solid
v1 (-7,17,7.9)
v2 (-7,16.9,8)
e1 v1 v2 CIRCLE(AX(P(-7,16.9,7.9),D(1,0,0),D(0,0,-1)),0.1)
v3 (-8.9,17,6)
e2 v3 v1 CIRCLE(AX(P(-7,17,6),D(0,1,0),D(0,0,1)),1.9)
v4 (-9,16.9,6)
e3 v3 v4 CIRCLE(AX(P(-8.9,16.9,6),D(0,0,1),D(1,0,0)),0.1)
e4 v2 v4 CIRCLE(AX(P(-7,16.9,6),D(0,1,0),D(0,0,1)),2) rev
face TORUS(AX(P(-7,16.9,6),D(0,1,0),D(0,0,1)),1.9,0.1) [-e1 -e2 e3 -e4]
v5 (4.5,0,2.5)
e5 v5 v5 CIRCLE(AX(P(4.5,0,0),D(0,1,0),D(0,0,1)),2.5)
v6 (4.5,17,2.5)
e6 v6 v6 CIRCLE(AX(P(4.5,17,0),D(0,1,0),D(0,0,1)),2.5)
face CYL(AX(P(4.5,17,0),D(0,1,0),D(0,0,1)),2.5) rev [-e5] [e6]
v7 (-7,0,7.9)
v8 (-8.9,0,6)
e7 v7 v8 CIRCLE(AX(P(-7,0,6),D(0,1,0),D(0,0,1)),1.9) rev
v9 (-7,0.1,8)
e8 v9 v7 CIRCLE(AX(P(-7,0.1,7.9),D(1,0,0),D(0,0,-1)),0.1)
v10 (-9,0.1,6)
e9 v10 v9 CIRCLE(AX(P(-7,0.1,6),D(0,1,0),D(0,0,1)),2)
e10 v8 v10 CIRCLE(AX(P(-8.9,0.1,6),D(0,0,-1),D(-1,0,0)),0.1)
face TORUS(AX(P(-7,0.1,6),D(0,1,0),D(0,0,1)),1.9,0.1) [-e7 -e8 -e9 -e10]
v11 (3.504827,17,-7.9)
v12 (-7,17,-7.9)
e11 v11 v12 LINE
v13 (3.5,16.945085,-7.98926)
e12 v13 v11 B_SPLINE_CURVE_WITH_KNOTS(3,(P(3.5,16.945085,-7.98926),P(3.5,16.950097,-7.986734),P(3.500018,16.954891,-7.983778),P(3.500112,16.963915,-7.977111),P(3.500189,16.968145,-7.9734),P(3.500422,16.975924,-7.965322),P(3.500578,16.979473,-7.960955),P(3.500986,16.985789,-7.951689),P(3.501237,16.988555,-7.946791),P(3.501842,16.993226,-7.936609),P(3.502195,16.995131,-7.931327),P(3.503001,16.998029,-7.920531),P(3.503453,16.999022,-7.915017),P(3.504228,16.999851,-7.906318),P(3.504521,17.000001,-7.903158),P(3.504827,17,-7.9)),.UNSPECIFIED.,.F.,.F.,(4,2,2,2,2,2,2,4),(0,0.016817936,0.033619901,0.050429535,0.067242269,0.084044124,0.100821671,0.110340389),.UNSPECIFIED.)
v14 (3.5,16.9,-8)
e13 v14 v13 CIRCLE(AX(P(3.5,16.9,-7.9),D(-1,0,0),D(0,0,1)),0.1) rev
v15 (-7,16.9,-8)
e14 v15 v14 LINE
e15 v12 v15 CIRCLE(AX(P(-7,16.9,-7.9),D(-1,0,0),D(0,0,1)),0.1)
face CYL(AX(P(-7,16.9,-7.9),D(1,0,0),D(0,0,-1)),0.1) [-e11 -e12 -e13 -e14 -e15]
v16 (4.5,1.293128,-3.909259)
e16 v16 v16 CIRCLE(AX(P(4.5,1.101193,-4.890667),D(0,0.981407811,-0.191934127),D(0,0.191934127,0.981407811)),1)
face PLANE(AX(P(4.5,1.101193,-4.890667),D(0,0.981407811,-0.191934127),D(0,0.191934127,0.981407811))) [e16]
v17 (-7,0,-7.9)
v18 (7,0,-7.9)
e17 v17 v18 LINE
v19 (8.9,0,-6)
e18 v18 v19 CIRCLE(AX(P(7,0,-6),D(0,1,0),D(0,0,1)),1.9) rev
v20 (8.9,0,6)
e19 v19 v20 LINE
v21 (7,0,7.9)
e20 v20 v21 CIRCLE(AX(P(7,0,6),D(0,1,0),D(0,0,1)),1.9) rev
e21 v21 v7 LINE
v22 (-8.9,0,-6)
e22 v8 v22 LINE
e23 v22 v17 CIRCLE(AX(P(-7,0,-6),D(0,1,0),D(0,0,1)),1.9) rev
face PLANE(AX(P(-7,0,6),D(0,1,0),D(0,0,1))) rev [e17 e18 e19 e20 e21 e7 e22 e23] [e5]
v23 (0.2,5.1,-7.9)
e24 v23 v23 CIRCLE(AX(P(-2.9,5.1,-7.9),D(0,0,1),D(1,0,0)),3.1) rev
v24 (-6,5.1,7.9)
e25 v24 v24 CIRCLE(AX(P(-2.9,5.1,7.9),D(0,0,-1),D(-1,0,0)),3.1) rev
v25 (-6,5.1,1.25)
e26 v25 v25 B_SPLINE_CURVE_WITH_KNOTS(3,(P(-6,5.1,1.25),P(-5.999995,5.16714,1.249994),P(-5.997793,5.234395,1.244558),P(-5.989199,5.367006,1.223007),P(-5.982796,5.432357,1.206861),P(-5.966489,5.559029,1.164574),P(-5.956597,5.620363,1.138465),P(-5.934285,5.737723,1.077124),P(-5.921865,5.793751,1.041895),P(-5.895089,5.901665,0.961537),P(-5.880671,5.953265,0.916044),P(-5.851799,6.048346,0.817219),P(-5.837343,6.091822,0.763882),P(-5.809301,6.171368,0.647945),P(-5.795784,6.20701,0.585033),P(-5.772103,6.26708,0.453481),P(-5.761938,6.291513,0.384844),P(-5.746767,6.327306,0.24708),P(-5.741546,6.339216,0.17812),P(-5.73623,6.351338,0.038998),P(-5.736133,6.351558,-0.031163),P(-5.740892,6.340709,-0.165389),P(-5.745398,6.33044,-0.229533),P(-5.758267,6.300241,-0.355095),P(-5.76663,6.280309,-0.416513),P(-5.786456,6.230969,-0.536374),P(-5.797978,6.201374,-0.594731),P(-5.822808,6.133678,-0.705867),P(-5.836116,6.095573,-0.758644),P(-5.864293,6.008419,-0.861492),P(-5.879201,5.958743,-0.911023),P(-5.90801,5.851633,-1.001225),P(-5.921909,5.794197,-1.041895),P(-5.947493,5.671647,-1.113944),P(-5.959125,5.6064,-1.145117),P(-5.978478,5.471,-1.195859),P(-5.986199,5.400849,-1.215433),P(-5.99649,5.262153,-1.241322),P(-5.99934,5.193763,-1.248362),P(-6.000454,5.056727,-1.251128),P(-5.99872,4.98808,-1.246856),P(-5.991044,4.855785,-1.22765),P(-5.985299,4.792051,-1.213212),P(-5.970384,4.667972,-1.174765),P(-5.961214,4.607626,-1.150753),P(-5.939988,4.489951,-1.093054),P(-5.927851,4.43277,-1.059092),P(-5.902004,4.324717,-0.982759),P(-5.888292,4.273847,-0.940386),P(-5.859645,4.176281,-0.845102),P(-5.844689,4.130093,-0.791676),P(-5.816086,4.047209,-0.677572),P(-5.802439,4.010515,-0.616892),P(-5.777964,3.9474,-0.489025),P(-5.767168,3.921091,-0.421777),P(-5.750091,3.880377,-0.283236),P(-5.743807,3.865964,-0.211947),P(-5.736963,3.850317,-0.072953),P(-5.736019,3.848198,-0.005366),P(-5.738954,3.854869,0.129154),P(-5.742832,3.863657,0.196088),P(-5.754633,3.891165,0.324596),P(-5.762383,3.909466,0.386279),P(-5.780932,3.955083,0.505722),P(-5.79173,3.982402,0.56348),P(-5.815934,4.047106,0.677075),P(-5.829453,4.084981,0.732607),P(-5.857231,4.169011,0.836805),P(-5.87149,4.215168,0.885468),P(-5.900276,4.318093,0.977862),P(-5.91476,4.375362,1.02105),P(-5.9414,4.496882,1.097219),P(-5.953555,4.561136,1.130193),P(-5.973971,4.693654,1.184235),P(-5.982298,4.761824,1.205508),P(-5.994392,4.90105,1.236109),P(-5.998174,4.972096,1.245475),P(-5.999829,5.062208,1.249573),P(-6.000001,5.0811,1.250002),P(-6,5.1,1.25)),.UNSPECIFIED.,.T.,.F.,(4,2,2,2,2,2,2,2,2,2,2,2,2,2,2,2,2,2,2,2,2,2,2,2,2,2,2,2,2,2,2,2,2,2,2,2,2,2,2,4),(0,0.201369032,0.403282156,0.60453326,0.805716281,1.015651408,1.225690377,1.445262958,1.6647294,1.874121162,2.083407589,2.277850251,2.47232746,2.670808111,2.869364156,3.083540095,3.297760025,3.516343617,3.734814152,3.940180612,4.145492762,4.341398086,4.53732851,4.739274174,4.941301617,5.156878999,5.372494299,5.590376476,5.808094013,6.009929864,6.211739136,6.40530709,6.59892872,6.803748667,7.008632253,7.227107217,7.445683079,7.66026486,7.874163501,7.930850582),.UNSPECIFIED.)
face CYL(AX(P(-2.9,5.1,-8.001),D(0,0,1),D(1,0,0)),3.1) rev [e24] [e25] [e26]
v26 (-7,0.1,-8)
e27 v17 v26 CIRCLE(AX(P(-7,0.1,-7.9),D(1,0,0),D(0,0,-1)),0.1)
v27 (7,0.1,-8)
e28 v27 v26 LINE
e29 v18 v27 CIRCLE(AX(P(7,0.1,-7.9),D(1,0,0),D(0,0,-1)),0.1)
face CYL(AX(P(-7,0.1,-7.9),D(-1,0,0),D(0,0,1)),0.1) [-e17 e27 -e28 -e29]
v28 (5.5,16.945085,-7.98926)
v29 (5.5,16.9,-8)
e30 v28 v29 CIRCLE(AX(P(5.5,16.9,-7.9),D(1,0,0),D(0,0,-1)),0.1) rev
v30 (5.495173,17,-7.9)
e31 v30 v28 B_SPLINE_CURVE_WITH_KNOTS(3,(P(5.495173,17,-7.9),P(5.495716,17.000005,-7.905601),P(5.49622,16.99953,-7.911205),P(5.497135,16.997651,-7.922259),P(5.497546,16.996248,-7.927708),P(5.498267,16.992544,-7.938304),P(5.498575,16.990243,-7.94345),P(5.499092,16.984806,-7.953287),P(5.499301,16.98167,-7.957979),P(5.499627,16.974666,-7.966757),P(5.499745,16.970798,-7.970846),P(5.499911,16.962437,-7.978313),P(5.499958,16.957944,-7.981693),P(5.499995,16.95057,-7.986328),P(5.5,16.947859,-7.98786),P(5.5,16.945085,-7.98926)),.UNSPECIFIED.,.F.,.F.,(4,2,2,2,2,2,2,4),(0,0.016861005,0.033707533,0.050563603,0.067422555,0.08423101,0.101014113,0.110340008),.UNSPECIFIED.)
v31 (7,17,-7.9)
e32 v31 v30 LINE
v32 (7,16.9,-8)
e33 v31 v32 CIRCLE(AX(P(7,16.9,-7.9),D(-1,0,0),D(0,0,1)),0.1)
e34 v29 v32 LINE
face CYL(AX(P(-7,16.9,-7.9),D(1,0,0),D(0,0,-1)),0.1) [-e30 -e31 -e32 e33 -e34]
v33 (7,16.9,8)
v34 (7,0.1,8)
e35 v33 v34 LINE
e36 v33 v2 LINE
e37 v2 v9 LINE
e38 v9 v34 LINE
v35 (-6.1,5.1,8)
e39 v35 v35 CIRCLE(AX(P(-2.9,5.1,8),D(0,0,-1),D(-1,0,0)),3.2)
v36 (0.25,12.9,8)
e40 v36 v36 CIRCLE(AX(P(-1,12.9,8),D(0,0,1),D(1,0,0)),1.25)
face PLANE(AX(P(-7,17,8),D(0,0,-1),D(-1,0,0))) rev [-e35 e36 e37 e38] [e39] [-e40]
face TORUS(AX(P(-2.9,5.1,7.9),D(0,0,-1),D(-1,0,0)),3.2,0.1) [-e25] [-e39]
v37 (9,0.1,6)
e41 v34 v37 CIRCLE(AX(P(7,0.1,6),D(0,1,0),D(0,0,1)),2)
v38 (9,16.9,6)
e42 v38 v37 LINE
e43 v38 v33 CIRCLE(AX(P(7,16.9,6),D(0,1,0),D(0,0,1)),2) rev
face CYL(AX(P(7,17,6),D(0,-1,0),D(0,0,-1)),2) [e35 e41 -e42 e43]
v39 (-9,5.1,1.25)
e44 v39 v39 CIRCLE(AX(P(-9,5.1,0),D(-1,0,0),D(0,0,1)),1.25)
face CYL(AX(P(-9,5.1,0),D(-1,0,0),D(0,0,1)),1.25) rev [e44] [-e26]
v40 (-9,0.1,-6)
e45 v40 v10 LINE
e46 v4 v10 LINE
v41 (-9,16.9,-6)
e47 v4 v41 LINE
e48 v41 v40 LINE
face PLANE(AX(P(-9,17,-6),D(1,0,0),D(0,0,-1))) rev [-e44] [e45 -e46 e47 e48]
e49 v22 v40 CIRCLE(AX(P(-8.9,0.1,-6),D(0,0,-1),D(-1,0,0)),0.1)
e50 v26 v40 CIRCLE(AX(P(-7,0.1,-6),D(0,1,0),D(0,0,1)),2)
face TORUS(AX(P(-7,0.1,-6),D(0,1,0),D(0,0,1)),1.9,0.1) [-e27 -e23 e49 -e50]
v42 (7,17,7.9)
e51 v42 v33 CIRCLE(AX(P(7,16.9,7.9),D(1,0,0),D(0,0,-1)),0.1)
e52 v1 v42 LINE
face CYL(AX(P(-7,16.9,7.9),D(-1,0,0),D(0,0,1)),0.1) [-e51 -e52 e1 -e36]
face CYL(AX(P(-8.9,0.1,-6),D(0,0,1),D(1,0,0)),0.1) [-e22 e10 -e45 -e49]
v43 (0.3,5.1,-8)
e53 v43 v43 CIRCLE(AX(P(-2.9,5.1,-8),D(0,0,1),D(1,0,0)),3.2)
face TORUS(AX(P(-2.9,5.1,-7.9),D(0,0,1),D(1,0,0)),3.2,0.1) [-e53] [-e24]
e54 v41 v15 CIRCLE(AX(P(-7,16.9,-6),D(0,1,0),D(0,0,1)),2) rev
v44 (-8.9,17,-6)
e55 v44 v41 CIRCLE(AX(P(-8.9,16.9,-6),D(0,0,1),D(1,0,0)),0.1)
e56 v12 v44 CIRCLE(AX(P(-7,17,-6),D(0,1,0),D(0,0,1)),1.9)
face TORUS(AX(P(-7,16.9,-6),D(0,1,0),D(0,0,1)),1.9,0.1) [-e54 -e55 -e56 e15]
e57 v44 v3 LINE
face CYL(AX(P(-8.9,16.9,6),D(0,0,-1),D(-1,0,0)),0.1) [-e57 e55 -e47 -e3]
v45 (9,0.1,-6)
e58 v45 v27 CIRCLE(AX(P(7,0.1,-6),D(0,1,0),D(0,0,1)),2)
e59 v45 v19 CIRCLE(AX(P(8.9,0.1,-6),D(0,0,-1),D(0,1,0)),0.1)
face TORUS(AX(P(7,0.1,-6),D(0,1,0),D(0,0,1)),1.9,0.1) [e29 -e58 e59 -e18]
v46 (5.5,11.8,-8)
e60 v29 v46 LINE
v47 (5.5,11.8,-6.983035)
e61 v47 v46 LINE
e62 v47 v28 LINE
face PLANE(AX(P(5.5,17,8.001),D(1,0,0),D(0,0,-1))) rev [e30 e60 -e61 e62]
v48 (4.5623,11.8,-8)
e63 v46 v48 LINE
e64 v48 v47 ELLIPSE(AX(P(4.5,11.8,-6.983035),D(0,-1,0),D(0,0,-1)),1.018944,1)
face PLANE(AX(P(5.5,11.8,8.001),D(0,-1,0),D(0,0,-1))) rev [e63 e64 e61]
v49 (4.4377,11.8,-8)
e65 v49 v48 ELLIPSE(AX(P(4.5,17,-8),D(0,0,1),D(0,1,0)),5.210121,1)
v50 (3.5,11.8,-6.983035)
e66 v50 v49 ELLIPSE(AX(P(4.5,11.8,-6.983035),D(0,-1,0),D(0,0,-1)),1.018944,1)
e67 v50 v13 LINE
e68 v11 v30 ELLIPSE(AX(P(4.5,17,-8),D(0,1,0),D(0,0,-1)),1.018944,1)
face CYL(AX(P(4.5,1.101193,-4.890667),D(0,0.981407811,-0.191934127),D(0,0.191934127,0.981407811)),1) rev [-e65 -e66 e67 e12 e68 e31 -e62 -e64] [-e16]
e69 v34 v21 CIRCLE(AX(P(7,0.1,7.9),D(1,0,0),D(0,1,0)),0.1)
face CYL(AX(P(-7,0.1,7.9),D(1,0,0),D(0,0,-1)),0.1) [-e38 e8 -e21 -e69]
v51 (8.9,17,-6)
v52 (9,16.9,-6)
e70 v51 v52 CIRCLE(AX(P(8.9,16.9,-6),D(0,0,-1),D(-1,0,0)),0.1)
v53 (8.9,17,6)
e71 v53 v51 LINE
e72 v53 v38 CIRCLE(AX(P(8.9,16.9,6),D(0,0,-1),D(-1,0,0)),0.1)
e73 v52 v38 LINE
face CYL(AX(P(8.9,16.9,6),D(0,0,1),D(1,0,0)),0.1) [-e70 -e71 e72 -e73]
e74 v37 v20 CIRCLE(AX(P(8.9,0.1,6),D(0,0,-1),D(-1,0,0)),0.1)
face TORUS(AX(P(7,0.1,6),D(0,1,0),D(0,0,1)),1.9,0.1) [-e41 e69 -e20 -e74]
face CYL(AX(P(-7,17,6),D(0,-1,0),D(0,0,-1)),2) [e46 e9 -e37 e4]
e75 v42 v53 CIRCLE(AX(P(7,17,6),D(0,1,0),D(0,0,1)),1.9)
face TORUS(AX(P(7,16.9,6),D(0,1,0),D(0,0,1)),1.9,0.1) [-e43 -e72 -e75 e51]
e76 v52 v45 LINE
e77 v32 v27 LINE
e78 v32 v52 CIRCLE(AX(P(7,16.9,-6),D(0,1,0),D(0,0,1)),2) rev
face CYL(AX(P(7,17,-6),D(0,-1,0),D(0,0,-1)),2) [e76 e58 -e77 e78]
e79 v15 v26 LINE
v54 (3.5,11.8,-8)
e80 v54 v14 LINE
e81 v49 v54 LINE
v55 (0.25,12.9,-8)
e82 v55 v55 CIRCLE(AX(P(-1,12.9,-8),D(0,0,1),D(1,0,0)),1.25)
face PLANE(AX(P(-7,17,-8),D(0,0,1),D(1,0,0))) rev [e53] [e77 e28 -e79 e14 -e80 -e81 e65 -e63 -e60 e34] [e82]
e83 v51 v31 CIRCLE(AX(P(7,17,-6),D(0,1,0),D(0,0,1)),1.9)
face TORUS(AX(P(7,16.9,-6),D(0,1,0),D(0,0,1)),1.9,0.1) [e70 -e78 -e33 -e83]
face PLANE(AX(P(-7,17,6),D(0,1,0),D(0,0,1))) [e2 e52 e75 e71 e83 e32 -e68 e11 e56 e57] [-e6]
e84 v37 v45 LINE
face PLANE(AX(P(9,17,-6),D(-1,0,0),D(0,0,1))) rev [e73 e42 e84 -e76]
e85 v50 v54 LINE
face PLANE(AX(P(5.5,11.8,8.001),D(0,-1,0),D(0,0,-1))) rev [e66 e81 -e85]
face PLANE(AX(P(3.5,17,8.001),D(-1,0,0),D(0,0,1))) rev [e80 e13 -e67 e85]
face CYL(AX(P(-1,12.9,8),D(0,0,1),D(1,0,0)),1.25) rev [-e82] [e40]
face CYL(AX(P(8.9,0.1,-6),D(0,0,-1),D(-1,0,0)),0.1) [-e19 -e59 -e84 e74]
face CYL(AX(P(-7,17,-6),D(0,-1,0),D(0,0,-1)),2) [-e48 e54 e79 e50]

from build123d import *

# Parameters (mm, degrees)
BOSS_EXTRUDE1_DEPTH    = 17
M6_TAPPED_HOLE1_D      = 5
CUT_EXTRUDE1_REACH     = 27.02
SKETCH5_R              = 3.1
M3_TAPPED_HOLE1_REACH  = 28.019
M3_TAPPED_HOLE1_BORE_R = 1.25
M3_TAPPED_HOLE2_D      = 2.5
SKETCH13_R             = 1
CUT_EXTRUDE2_DEPTH     = 16.2
CUT_EXTRUDE3_START     = 3.5
CUT_EXTRUDE3_DEPTH     = 2
FILLET1_R              = 0.1


with BuildPart() as part:
    # Sketch1 → Boss-Extrude1 (new body)
    with BuildSketch(Plane(origin=(0, 0, 0), x_dir=(1, 0, 0), z_dir=(0, 1, 0))):
        with BuildLine():
            Line((-7, 8), (7, 8))
            ThreePointArc((7, 8), (8.414213562, 7.414213562), (9, 6))
            Line((9, 6), (9, -6))
            ThreePointArc((9, -6), (8.414213562, -7.414213562), (7, -8))
            Line((7, -8), (-7, -8))
            ThreePointArc((-7, -8), (-8.414213562, -7.414213562), (-9, -6))
            Line((-9, -6), (-9, 6))
            ThreePointArc((-9, 6), (-8.414213562, 7.414213562), (-7, 8))
        make_face()
    extrude(amount=BOSS_EXTRUDE1_DEPTH)

    # M6 Tapped Hole1 (through all)
    with Locations(Plane(origin=(0, 17, 0), x_dir=(1, 0, 0), z_dir=(0, 1, 0))):
        with Locations((4.5, 0)):
            Hole(M6_TAPPED_HOLE1_D / 2)

    # Sketch5 → Cut-Extrude1 (cut, up to next)
    with BuildSketch(Plane.XY.offset(8), mode=Mode.PRIVATE) as cut_extrude1_sk1:
        with Locations((-2.9, 5.1)):
            Circle(SKETCH5_R)
    cut_extrude1_tool1 = extrude(cut_extrude1_sk1.sketch, amount=-CUT_EXTRUDE1_REACH, mode=Mode.PRIVATE) & part.part
    add(cut_extrude1_tool1.solids().sort_by_distance((-2.9, 5.1, 8))[0], mode=Mode.SUBTRACT)

    # M3 Tapped Hole1 bore → M3 Tapped Hole1 (cut, up to next)
    with BuildSketch(Plane.ZY.offset(9), mode=Mode.PRIVATE) as m3_tapped_hole1_sk1:
        with Locations((0, 5.1)):
            Circle(M3_TAPPED_HOLE1_BORE_R)
    m3_tapped_hole1_tool1 = extrude(m3_tapped_hole1_sk1.sketch, amount=-M3_TAPPED_HOLE1_REACH, mode=Mode.PRIVATE) & part.part
    add(m3_tapped_hole1_tool1.solids().sort_by_distance((-9, 5.1, 0))[0], mode=Mode.SUBTRACT)

    # M3 Tapped Hole2 (through all)
    with Locations(Plane.XY.offset(8)):
        with Locations((-1, 12.9)):
            Hole(M3_TAPPED_HOLE2_D / 2)

    # Sketch13 → Cut-Extrude2 (cut)
    with BuildSketch(Plane(origin=(0, 17.880667156, -3.496925738), x_dir=(1, 0, 0), z_dir=(0, 0.9814078107791567, -0.19193412656863024))):
        with Locations(Location((4.5, 4.588382335, 0), (0, 0, 270))):
            Circle(SKETCH13_R)
    extrude(amount=-CUT_EXTRUDE2_DEPTH, mode=Mode.SUBTRACT)

    # Cut-Extrude3: read off the stored shape, not the designer's step
    # Cut-Extrude3 outline → Cut-Extrude3 (cut)
    with BuildSketch(Plane.YZ.offset(CUT_EXTRUDE3_START)):
        Polygon((17, -8), (11.8, -6.983034935), (11.8, -8), align=None)
    extrude(amount=CUT_EXTRUDE3_DEPTH, mode=Mode.SUBTRACT)

    # Fillet1
    fillet1_edges = [part.edges().sort_by_distance(p)[0] for p in [
        (8.414213562, 0, -7.414213562),
        (9, 0, 0),
        (8.414213562, 0, 7.414213562),
        (0, 0, 8),
        (-8.414213562, 0, 7.414213562),
        (-9, 0, 0),
        (-8.414213562, 0, -7.414213562),
        (6.25, 17, -8),
        (8.414213562, 17, -7.414213562),
        (9, 17, 0),
        (8.414213562, 17, 7.414213562),
        (0, 17, 8),
        (-8.414213562, 17, 7.414213562),
        (-9, 17, 0),
        (-8.414213562, 17, -7.414213562),
        (-6, 5.1, 8),
        (0, 0, -8),
        (-6, 5.1, -8),
        (-1.75, 17, -8),
    ]]
    fillet(fillet1_edges, radius=FILLET1_R)


solid = part.part
